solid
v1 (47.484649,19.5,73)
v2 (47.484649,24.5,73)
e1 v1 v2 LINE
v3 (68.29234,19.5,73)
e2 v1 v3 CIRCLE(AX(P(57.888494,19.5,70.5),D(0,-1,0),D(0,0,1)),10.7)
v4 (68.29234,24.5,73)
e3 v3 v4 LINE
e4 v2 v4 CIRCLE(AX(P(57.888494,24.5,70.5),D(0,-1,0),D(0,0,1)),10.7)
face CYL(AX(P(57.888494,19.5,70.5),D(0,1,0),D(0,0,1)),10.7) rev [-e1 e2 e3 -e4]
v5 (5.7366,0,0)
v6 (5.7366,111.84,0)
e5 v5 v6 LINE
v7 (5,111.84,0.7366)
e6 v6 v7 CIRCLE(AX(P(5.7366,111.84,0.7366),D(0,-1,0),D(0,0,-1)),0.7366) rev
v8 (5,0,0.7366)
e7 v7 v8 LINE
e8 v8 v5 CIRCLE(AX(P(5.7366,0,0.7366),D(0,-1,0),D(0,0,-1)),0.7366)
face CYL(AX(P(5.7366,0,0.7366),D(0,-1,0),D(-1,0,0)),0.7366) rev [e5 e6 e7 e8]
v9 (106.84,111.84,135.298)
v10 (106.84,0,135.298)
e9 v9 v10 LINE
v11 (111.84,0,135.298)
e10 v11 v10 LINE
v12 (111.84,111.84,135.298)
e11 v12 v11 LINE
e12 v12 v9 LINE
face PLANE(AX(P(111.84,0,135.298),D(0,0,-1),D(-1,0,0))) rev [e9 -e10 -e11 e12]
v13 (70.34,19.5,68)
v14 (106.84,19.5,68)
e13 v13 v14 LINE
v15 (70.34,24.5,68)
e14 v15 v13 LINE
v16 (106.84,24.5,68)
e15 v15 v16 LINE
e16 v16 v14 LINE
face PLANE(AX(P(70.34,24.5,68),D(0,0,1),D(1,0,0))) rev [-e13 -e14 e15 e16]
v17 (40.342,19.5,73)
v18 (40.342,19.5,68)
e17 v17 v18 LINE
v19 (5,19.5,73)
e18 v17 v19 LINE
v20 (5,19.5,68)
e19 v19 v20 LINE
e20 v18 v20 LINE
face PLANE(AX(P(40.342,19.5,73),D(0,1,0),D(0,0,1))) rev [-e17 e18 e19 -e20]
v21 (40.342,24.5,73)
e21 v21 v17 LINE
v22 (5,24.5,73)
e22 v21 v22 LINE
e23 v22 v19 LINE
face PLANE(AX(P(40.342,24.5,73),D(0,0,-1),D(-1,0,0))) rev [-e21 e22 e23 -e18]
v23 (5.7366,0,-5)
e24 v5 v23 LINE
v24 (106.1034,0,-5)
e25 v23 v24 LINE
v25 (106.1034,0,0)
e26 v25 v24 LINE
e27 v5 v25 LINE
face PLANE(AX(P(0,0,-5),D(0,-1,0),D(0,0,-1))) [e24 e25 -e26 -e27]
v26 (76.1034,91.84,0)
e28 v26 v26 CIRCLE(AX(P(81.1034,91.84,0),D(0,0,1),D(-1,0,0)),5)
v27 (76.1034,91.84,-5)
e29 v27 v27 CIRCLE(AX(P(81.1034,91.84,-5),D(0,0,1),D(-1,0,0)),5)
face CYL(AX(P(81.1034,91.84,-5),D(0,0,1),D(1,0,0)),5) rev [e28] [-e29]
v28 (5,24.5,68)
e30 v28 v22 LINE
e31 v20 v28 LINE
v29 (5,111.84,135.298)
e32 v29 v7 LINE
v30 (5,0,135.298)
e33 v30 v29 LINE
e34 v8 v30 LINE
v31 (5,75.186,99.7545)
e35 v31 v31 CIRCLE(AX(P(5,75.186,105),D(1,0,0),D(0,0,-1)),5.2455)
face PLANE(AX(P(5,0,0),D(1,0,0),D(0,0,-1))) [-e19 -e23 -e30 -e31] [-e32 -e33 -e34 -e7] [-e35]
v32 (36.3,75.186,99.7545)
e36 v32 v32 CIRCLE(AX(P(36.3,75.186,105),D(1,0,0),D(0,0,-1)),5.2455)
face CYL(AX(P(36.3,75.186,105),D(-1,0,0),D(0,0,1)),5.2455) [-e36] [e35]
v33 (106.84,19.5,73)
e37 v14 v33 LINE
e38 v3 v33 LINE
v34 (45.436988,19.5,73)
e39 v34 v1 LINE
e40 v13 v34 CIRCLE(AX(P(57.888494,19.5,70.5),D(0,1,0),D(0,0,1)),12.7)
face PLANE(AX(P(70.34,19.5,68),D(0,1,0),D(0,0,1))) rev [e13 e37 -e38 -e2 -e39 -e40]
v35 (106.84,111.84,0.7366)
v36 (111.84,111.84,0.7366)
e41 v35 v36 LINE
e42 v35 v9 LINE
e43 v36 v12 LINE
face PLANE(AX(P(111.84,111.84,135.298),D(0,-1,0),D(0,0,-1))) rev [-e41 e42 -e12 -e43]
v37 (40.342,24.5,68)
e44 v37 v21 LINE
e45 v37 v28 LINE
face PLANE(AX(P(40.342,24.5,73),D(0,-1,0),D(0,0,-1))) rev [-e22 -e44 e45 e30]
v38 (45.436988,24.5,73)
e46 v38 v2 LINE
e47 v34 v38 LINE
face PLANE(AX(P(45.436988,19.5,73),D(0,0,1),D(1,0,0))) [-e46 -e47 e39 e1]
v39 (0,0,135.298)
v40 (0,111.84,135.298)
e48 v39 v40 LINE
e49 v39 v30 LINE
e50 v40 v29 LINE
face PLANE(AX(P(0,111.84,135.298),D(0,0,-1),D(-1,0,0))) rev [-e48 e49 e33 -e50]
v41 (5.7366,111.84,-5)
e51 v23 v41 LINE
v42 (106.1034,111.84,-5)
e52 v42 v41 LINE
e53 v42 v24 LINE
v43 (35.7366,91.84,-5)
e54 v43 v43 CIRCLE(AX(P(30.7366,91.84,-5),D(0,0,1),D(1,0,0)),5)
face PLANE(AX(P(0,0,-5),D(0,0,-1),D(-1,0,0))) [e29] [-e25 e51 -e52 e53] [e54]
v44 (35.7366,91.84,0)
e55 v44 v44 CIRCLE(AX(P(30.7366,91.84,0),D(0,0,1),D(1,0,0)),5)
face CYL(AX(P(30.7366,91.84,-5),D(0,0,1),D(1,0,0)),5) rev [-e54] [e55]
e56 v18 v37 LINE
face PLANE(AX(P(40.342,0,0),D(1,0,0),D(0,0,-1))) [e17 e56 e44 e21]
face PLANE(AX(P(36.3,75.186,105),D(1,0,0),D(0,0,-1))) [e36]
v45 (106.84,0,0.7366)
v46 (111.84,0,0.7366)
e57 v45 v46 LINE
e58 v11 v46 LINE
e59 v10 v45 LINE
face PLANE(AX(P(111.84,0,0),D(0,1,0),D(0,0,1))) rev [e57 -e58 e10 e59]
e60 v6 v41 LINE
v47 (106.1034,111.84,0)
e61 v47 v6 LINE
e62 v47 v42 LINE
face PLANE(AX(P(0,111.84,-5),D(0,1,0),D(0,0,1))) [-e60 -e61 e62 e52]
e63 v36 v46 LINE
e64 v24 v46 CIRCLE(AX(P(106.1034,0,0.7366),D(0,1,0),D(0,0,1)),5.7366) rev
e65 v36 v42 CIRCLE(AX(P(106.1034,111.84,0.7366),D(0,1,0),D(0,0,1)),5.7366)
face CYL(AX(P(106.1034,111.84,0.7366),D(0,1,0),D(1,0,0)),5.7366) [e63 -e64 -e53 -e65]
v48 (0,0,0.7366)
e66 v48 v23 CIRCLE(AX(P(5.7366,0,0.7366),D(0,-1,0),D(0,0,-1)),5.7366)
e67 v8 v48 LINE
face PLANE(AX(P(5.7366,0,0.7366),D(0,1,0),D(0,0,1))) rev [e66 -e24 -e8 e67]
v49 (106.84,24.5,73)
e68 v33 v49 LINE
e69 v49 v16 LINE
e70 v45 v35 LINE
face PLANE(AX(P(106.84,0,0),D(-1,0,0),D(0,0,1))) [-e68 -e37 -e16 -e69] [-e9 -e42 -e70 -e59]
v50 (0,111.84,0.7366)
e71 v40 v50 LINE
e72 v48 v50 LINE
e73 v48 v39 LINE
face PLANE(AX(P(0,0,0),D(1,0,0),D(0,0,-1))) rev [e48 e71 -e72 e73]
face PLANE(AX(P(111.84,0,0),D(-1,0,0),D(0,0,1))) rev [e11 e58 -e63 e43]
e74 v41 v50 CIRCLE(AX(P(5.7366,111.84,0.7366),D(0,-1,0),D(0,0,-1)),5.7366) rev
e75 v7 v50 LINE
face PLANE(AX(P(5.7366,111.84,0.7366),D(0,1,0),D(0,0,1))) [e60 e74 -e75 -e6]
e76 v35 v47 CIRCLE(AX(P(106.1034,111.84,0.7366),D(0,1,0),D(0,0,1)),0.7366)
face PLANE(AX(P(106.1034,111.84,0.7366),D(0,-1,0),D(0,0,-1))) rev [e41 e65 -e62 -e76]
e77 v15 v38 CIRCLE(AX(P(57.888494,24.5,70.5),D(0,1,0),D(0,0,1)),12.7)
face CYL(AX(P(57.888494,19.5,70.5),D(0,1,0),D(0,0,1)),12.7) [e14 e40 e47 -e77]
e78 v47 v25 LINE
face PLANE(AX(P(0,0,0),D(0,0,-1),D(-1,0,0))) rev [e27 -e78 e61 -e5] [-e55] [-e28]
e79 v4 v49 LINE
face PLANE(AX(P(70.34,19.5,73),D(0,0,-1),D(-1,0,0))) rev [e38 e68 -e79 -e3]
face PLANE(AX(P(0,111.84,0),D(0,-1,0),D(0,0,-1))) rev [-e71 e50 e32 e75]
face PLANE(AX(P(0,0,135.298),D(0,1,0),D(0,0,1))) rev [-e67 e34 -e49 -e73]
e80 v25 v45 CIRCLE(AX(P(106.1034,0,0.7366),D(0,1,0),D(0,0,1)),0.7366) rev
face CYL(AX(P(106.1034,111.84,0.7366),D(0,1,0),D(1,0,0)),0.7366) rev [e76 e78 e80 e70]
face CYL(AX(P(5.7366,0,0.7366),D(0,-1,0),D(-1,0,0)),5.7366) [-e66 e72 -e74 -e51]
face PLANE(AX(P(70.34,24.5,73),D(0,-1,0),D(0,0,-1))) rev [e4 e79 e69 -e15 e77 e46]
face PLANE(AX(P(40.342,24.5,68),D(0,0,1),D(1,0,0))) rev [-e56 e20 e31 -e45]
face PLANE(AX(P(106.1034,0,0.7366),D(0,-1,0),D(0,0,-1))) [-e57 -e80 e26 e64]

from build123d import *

# Parameters (mm, degrees)
SKETCH13_W                   = 111.84
SKETCH13_H                   = 111.84
BASE_FLANGE2_DEPTH           = 5
EDGE_FLANGE1_STRIP_W         = 21.4732
EDGE_FLANGE1_STRIP_H         = 5
EDGE_FLANGE1_STRIP_CUT_DEPTH = 111.84
EDGE_FLANGE1_DEPTH           = 111.84
EDGE_FLANGE2_STRIP_W         = 21.4732
EDGE_FLANGE2_STRIP_H         = 5
EDGE_FLANGE2_STRIP_CUT_DEPTH = 111.84
EDGE_FLANGE2_DEPTH           = 111.84
SKETCH25_R                   = 5
CUT_EXTRUDE1_DEPTH           = 209.139184211
SKETCH27_W                   = 5
SKETCH27_H                   = 5
BOSS_EXTRUDE3_DEPTH          = 35.342
SKETCH28_W                   = 5
SKETCH28_H                   = 5
BOSS_EXTRUDE1_DEPTH          = 36.5
BOSS_EXTRUDE2_DEPTH          = 5
SKETCH40_R                   = 5.2455
BOSS_EXTRUDE7_DEPTH          = 31.3


# Sheet-metal steps are written as plain solids
with BuildPart() as part:
    # Sketch13 → Base-Flange2 (new body)
    with BuildSketch(Plane.XY):
        with Locations((55.92, 55.92)):
            Rectangle(SKETCH13_W, SKETCH13_H)
    extrude(amount=-BASE_FLANGE2_DEPTH)

    # Edge-Flange1 strip (across the edge) → Edge-Flange1 strip cut (cut)
    with BuildSketch(Plane.XZ.offset(-111.84)):
        with Locations((-5, -2.5)):
            Rectangle(EDGE_FLANGE1_STRIP_W, EDGE_FLANGE1_STRIP_H)
    extrude(amount=EDGE_FLANGE1_STRIP_CUT_DEPTH, mode=Mode.SUBTRACT)

    # Edge-Flange1 section (across the edge) → Edge-Flange1 (add)
    with BuildSketch(Plane.XZ.offset(-111.84)):
        with BuildLine():
            Line((0, 0.7366), (0, 135.298))
            Line((0, 135.298), (5, 135.298))
            Line((5, 135.298), (5, 0.7366))
            ThreePointArc((5, 0.7366), (5.215745145, 0.215745145), (5.7366, 0))
            Line((5.7366, 0), (5.7366, -5))
            ThreePointArc((5.7366, -5), (1.680211239, -3.319788761), (0, 0.7366))
        make_face()
    extrude(amount=EDGE_FLANGE1_DEPTH)

    # Edge-Flange2 strip (across the edge) → Edge-Flange2 strip cut (cut)
    with BuildSketch(Plane(origin=(111.84, 0, 0), x_dir=(-1, 0, 0), z_dir=(0, 1, 0))):
        with Locations((-5, -2.5)):
            Rectangle(EDGE_FLANGE2_STRIP_W, EDGE_FLANGE2_STRIP_H)
    extrude(amount=EDGE_FLANGE2_STRIP_CUT_DEPTH, mode=Mode.SUBTRACT)

    # Edge-Flange2 section (across the edge) → Edge-Flange2 (add)
    with BuildSketch(Plane(origin=(111.84, 0, 0), x_dir=(-1, 0, 0), z_dir=(0, 1, 0))):
        with BuildLine():
            Line((0, 0.7366), (0, 135.298))
            Line((0, 135.298), (5, 135.298))
            Line((5, 135.298), (5, 0.7366))
            ThreePointArc((5, 0.7366), (5.215745145, 0.215745145), (5.7366, 0))
            Line((5.7366, 0), (5.7366, -5))
            ThreePointArc((5.7366, -5), (1.680211239, -3.319788761), (0, 0.7366))
        make_face()
    extrude(amount=EDGE_FLANGE2_DEPTH)

    # Sketch25 → Cut-Extrude1 (cut, through all)
    with BuildSketch(Plane.XY):
        with Locations((30.7366, 91.84)):
            Circle(SKETCH25_R)
        with Locations(Location((81.1034, 91.84, 0), (0, 0, 180))):
            Circle(SKETCH25_R)
    extrude(amount=-CUT_EXTRUDE1_DEPTH, mode=Mode.SUBTRACT)

    # Sketch27 → Boss-Extrude3 (add)
    with BuildSketch(Plane(origin=(5, 0, 0), x_dir=(0, 0, -1), z_dir=(1, 0, 0))):
        with Locations((-70.5, 22)):
            Rectangle(SKETCH27_W, SKETCH27_H)
    extrude(amount=BOSS_EXTRUDE3_DEPTH)

    # Sketch28 → Boss-Extrude1 (add)
    with BuildSketch(Plane.ZY.offset(-106.84)):
        with Locations((70.5, 22)):
            Rectangle(SKETCH28_W, SKETCH28_H)
    extrude(amount=BOSS_EXTRUDE1_DEPTH)

    # Sketch29 → Boss-Extrude2 (add)
    with BuildSketch(Plane(origin=(0, 24.5, 0), x_dir=(1, 0, 0), z_dir=(0, 1, 0))):
        with BuildLine():
            Line((45.436988134, -73), (47.484648624, -73))
            ThreePointArc((47.484648624, -73), (57.888494067, -59.8), (68.29233951, -73))
            Line((68.29233951, -73), (70.34, -73))
            ThreePointArc((70.34, -73), (57.888494067, -57.8), (45.436988134, -73))
        make_face()
    extrude(amount=-BOSS_EXTRUDE2_DEPTH)

    # Sketch40 → Boss-Extrude7 (add)
    with BuildSketch(Plane(origin=(5, 0, 0), x_dir=(0, 0, -1), z_dir=(1, 0, 0))):
        with Locations((-105, 75.186)):
            Circle(SKETCH40_R)
    extrude(amount=BOSS_EXTRUDE7_DEPTH)


solid = part.part
